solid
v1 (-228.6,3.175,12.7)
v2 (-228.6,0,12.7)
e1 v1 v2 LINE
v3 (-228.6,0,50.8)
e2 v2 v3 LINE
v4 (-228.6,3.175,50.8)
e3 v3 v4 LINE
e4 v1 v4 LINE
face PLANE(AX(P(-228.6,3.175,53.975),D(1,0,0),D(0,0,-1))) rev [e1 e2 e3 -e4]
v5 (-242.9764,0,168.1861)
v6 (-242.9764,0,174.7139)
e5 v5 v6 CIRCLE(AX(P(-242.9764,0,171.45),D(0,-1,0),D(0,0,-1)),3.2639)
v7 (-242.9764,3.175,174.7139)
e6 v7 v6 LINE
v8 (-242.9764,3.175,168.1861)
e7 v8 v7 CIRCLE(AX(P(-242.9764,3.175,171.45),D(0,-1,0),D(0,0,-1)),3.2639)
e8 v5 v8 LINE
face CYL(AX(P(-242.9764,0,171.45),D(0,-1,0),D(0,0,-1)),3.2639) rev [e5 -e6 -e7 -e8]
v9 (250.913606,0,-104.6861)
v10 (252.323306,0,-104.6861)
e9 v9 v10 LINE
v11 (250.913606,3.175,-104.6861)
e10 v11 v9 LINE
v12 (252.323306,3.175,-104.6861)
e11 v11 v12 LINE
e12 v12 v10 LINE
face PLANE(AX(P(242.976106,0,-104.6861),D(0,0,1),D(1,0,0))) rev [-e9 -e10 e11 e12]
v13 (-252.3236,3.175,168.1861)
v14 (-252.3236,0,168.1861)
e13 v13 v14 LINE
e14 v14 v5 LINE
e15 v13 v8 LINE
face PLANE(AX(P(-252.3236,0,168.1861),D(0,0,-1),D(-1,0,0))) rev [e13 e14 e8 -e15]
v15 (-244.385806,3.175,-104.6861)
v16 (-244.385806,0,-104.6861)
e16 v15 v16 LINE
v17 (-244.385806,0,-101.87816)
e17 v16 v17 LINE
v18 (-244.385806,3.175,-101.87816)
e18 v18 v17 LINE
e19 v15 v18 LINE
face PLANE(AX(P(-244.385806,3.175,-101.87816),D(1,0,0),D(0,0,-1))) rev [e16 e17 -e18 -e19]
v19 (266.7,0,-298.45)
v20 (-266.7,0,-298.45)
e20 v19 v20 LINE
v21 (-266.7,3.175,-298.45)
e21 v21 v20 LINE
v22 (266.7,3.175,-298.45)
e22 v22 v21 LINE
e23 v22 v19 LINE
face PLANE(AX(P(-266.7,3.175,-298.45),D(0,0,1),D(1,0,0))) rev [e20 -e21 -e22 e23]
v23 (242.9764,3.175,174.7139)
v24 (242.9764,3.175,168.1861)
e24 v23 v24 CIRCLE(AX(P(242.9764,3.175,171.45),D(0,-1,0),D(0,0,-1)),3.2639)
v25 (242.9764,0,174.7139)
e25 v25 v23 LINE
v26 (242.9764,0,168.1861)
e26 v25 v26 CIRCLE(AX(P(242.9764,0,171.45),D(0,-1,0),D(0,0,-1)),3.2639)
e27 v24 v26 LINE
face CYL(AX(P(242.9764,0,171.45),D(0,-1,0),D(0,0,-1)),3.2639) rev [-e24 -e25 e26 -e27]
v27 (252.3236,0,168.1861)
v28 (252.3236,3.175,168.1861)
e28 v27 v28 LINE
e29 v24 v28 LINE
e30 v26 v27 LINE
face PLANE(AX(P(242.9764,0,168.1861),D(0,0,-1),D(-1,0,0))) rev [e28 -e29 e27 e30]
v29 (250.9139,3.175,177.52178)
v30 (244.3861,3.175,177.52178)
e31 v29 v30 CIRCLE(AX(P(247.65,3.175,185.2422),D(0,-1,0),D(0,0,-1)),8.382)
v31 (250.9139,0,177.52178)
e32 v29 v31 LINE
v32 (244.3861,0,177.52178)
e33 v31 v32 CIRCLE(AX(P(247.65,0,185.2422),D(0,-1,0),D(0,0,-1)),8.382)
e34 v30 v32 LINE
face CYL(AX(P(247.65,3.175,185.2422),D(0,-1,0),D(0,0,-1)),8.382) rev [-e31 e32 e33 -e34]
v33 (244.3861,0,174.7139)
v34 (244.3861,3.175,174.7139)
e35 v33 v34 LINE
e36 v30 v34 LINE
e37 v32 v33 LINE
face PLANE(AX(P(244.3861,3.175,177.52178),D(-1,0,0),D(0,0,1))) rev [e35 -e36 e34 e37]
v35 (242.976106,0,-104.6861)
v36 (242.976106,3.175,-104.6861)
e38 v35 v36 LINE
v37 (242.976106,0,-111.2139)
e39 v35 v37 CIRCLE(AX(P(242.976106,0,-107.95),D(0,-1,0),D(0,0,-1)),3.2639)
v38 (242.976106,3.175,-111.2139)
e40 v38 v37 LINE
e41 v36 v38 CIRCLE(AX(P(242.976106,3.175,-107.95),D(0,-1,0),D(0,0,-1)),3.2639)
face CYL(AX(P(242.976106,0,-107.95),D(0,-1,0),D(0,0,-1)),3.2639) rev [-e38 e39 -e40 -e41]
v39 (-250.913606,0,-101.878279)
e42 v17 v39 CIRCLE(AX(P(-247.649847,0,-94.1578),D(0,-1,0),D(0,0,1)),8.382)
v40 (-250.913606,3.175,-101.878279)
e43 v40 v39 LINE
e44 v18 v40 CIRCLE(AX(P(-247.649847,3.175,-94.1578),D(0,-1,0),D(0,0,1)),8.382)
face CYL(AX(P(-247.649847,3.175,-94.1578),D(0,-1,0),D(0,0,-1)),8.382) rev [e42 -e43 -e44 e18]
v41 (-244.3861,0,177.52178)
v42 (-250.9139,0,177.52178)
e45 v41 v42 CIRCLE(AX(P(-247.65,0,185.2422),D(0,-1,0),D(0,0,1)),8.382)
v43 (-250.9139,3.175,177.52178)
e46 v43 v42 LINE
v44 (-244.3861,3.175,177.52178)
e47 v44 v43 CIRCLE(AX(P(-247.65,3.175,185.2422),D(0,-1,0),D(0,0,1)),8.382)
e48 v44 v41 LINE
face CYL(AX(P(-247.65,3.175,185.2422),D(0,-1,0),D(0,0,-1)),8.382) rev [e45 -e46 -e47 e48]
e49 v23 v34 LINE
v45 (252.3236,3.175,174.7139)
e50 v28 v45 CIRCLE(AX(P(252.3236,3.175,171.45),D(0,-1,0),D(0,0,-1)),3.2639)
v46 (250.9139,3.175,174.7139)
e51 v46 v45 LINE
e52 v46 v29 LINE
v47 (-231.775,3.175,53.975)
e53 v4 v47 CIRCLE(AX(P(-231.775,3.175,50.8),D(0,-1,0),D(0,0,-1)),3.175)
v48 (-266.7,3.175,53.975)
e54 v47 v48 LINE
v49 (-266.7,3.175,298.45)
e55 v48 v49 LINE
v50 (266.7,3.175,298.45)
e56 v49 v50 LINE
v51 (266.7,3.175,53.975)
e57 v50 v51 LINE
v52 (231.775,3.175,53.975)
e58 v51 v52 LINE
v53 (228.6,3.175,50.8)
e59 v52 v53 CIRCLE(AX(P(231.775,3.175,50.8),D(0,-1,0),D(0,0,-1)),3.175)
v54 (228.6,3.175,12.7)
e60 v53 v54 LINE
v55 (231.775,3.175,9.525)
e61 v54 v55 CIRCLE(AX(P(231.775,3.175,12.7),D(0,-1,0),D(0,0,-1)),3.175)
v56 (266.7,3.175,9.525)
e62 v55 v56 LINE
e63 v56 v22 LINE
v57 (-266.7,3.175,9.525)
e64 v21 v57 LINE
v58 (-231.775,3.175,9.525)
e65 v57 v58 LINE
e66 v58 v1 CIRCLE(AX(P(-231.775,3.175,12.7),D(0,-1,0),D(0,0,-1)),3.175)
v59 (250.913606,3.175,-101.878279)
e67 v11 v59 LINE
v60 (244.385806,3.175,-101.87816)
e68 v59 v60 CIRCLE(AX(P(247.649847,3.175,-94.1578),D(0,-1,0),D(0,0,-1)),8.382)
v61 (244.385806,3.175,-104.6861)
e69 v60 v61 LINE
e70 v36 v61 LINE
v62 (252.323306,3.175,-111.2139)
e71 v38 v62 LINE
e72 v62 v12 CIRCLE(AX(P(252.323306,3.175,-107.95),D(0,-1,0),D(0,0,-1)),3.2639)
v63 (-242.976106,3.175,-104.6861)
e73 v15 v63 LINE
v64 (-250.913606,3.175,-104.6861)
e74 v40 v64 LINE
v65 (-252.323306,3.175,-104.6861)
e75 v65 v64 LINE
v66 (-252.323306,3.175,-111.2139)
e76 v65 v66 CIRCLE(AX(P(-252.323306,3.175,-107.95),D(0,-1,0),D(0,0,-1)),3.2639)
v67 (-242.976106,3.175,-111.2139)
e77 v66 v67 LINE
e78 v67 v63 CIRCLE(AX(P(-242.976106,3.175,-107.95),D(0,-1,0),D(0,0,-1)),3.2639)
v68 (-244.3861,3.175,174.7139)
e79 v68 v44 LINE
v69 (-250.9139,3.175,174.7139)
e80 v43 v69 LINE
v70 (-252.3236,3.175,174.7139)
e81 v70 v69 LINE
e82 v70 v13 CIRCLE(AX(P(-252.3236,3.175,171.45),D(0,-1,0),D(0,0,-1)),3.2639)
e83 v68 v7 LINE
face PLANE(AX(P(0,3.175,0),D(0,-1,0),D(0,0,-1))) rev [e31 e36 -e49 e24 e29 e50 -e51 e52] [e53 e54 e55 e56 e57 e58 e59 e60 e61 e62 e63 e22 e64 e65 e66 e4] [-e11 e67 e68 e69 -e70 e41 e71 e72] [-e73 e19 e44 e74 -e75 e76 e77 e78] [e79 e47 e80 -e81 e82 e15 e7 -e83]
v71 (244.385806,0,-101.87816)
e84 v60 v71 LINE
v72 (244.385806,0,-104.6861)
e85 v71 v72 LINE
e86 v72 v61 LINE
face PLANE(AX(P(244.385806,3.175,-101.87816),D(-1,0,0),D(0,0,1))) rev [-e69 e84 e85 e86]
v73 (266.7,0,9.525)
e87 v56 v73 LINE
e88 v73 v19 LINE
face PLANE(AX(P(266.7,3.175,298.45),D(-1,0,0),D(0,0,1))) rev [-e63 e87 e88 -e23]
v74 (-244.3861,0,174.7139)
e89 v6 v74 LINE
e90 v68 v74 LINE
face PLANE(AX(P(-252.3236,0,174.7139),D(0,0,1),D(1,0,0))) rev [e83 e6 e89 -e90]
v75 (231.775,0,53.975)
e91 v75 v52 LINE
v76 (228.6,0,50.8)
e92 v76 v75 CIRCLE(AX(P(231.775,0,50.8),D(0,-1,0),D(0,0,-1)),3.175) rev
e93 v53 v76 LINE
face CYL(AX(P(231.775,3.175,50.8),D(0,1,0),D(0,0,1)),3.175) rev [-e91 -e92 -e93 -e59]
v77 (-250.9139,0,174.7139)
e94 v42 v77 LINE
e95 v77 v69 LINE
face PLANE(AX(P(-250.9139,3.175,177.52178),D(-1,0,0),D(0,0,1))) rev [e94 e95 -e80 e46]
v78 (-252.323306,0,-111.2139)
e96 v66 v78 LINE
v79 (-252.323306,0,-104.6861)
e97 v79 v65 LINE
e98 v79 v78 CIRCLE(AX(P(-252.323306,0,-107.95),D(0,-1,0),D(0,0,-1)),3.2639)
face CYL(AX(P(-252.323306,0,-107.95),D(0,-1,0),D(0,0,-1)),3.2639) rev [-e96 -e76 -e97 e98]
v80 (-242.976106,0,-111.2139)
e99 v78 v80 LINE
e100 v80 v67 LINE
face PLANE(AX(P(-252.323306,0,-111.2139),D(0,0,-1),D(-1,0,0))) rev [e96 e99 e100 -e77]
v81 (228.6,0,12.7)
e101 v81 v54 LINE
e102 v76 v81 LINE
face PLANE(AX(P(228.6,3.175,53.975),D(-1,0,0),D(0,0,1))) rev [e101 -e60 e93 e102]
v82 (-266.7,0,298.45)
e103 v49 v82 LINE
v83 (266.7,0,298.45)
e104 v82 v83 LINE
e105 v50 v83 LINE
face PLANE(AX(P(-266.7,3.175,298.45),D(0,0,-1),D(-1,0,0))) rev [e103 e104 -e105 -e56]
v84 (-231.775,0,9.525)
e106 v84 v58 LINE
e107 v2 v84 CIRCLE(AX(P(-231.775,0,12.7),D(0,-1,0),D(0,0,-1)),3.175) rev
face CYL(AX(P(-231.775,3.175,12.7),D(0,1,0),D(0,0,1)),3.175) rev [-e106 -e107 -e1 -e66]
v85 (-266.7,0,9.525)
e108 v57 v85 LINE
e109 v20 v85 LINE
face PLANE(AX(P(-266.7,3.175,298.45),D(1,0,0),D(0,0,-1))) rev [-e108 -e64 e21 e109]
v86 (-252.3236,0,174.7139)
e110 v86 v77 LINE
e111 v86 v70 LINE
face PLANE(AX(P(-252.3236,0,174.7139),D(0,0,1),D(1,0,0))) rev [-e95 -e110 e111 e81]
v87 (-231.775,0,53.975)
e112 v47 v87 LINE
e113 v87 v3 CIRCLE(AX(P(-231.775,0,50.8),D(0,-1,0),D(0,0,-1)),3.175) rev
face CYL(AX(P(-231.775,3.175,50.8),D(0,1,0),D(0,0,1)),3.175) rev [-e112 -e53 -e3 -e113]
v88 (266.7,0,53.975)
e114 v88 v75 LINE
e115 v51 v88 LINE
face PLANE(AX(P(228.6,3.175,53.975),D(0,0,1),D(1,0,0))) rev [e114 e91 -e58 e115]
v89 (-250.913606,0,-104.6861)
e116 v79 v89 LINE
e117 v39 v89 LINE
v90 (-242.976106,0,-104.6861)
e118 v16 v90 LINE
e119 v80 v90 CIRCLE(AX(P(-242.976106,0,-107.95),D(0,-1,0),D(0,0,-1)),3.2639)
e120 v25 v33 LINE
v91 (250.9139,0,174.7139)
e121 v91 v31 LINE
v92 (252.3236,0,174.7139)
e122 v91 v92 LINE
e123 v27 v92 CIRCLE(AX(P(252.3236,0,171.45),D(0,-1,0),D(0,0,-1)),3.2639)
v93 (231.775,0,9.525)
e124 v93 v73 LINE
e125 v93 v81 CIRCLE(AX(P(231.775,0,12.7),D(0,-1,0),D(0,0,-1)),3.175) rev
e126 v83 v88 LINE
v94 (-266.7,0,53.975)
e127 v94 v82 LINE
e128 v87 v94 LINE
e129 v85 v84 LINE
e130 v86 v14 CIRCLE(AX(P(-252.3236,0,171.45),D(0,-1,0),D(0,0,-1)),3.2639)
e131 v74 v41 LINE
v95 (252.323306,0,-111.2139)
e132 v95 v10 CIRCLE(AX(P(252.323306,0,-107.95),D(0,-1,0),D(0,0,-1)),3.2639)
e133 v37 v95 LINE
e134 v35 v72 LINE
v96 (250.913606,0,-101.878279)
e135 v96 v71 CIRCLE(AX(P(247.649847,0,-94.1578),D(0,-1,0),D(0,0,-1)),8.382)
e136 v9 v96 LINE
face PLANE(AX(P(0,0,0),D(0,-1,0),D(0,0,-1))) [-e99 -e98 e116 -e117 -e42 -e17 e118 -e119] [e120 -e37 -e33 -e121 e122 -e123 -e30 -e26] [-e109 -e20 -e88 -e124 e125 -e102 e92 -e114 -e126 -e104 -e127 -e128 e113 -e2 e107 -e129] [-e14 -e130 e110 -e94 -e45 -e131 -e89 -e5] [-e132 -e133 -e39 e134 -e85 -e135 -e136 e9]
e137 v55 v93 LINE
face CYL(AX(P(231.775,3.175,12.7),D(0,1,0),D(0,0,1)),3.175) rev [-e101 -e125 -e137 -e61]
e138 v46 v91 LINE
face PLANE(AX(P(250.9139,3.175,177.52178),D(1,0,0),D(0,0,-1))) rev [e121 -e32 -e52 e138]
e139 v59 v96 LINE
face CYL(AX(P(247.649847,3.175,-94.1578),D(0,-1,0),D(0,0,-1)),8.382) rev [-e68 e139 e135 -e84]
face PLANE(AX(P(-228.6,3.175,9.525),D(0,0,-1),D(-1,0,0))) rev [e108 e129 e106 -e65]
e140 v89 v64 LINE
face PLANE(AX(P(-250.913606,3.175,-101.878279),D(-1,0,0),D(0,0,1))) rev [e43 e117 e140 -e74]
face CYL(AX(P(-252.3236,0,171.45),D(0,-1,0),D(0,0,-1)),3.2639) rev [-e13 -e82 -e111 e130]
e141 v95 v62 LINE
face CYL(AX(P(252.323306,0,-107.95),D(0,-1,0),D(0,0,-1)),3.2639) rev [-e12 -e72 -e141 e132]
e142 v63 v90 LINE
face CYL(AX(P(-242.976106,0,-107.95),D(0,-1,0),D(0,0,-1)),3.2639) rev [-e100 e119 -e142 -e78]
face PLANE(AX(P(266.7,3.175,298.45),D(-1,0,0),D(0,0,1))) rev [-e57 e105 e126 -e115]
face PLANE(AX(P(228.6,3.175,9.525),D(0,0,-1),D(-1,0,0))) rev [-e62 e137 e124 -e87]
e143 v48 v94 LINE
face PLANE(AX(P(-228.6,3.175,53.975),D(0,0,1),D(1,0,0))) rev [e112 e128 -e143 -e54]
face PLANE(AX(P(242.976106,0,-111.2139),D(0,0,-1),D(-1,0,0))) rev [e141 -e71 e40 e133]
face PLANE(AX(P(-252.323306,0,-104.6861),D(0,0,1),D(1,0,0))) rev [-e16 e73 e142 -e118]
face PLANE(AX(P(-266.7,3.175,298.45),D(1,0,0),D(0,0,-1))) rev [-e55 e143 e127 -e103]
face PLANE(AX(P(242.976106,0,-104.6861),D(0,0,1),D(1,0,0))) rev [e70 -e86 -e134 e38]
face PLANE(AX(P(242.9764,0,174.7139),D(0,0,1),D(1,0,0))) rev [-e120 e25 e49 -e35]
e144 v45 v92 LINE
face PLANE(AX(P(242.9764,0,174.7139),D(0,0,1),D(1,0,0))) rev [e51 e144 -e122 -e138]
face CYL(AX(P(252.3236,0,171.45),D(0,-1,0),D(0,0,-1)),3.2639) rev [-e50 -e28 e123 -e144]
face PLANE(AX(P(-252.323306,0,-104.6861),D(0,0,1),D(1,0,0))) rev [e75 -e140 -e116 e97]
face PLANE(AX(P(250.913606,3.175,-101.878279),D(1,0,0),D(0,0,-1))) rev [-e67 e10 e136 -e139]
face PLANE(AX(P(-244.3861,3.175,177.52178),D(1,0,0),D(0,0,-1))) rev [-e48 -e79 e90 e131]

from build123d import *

# Parameters (mm, degrees)
SKETCH1_W                    = 533.4
SKETCH1_H                    = 596.9
BOSS_EXTRUDE1_DEPTH          = 3.175
CUT_EXTRUDE1_DEPTH           = 401.264129201
F_0_257_DIAMETER_SLOT1_DEPTH = 3.175
SKETCH8_W                    = 38.1
SKETCH8_H                    = 44.45
CUT_EXTRUDE2_DEPTH           = 401.264129201
FILLET1_R                    = 3.175


# Read off the part's stored shape, not the designer's step: F (0.257) Diameter Slot1
with BuildPart() as part:
    # Sketch1 → Boss-Extrude1 (new body)
    with BuildSketch(Plane(origin=(0, 0, 0), x_dir=(1, 0, 0), z_dir=(0, 1, 0))):
        Rectangle(SKETCH1_W, SKETCH1_H)
    extrude(amount=BOSS_EXTRUDE1_DEPTH)

    # Sketch5 → Cut-Extrude1 (cut, through all)
    with BuildSketch(Plane.XZ):
        with BuildLine():
            Line((244.385805934, -101.878160113), (244.385805934, -107.950617892))
            ThreePointArc((244.385805934, -107.950617892), (247.65, -111.213899987), (250.913605875, -107.950029643))
            Line((250.913605875, -107.950029643), (250.913605875, -101.878279337))
            ThreePointArc((250.913605875, -101.878279337), (247.65, -85.775799987), (244.385805934, -101.878160113))
        make_face()
        with BuildLine():
            Line((250.9139, 177.521780271), (250.9139, 171.450000343))
            ThreePointArc((250.9139, 171.450000343), (247.65, 168.1861), (244.3861, 171.450000343))
            Line((244.3861, 171.450000343), (244.3861, 177.521780271))
            ThreePointArc((244.3861, 177.521780271), (247.65, 193.6242), (250.9139, 177.521780271))
        make_face()
        with BuildLine():
            Line((-244.3861, 177.521780271), (-244.3861, 171.450000343))
            ThreePointArc((-244.3861, 171.450000343), (-247.65, 168.1861), (-250.9139, 171.450000343))
            Line((-250.9139, 171.450000343), (-250.9139, 177.521780271))
            ThreePointArc((-250.9139, 177.521780271), (-247.65, 193.6242), (-244.3861, 177.521780271))
        make_face()
        with BuildLine():
            Line((-250.913605875, -101.878279337), (-250.913605875, -107.950029643))
            ThreePointArc((-250.913605875, -107.950029643), (-247.65, -111.213899987), (-244.385805934, -107.950617892))
            Line((-244.385805934, -107.950617892), (-244.385805934, -101.878160113))
            ThreePointArc((-244.385805934, -101.878160113), (-247.65, -85.775799987), (-250.913605875, -101.878279337))
        make_face()
    extrude(amount=-CUT_EXTRUDE1_DEPTH, mode=Mode.SUBTRACT)

    # F (0.257) Diameter Slot1 outline → F (0.257) Diameter Slot1 (cut)
    with BuildSketch(Plane(origin=(0, 0, 0), x_dir=(1, 0, 0), z_dir=(0, 1, 0))):
        with BuildLine():
            ThreePointArc((252.3236, -174.7139), (255.5875, -171.45), (252.3236, -168.1861))
            Line((252.3236, -168.1861), (247.65, -168.1861))
            ThreePointArc((247.65, -168.1861), (249.957925944, -169.142074298), (250.9139, -171.450000343))
            Line((250.9139, -171.450000343), (250.9139, -174.7139))
            Line((250.9139, -174.7139), (252.3236, -174.7139))
        make_face()
        with BuildLine():
            ThreePointArc((244.3861, -171.450000343), (245.342074056, -169.142074298), (247.65, -168.1861))
            Line((247.65, -168.1861), (242.9764, -168.1861))
            ThreePointArc((242.9764, -168.1861), (239.7125, -171.45), (242.9764, -174.7139))
            Line((242.9764, -174.7139), (244.3861, -174.7139))
            Line((244.3861, -174.7139), (244.3861, -171.450000343))
        make_face()
        with BuildLine():
            ThreePointArc((-242.9764, -174.7139), (-239.7125, -171.45), (-242.9764, -168.1861))
            Line((-242.9764, -168.1861), (-247.65, -168.1861))
            ThreePointArc((-247.65, -168.1861), (-245.342074056, -169.142074298), (-244.3861, -171.450000343))
            Line((-244.3861, -171.450000343), (-244.3861, -174.7139))
            Line((-244.3861, -174.7139), (-242.9764, -174.7139))
        make_face()
        with BuildLine():
            ThreePointArc((-250.9139, -171.450000343), (-249.957925944, -169.142074298), (-247.65, -168.1861))
            Line((-247.65, -168.1861), (-252.3236, -168.1861))
            ThreePointArc((-252.3236, -168.1861), (-255.5875, -171.45), (-252.3236, -174.7139))
            Line((-252.3236, -174.7139), (-250.9139, -174.7139))
            Line((-250.9139, -174.7139), (-250.9139, -171.450000343))
        make_face()
        with BuildLine():
            ThreePointArc((252.323305875, 104.6861), (255.587205875, 107.95), (252.323305875, 111.2139))
            Line((252.323305875, 111.2139), (247.649705875, 111.2139))
            ThreePointArc((247.649705875, 111.2139), (249.957621218, 110.257936304), (250.913605875, 107.950029643))
            Line((250.913605875, 107.950029643), (250.913605875, 104.6861))
            Line((250.913605875, 104.6861), (252.323305875, 104.6861))
        make_face()
        with BuildLine():
            ThreePointArc((244.385805934, 107.950617892), (245.34199852, 110.258144271), (247.649705875, 111.2139))
            Line((247.649705875, 111.2139), (242.976105875, 111.2139))
            ThreePointArc((242.976105875, 111.2139), (239.712205875, 107.95), (242.976105875, 104.6861))
            Line((242.976105875, 104.6861), (244.385805934, 104.6861))
            Line((244.385805934, 104.6861), (244.385805934, 107.950617892))
        make_face()
        with BuildLine():
            ThreePointArc((-242.976105875, 104.6861), (-239.712205875, 107.95), (-242.976105875, 111.2139))
            Line((-242.976105875, 111.2139), (-247.649705876, 111.2139))
            ThreePointArc((-247.649705876, 111.2139), (-245.341998521, 110.258144271), (-244.385805934, 107.950617892))
            Line((-244.385805934, 107.950617892), (-244.385805934, 104.6861))
            Line((-244.385805934, 104.6861), (-242.976105875, 104.6861))
        make_face()
        with BuildLine():
            ThreePointArc((-250.913605875, 107.950029643), (-249.957621218, 110.257936303), (-247.649705876, 111.2139))
            Line((-247.649705876, 111.2139), (-252.323305875, 111.2139))
            ThreePointArc((-252.323305875, 111.2139), (-255.587205875, 107.95), (-252.323305875, 104.6861))
            Line((-252.323305875, 104.6861), (-250.913605875, 104.6861))
            Line((-250.913605875, 104.6861), (-250.913605875, 107.950029643))
        make_face()
    extrude(amount=F_0_257_DIAMETER_SLOT1_DEPTH, mode=Mode.SUBTRACT)

    # Sketch8 → Cut-Extrude2 (cut, through all)
    with BuildSketch(Plane.XZ):
        with Locations((-247.65, 31.75)):
            Rectangle(SKETCH8_W, SKETCH8_H)
        with Locations((247.65, 31.75)):
            Rectangle(SKETCH8_W, SKETCH8_H)
    extrude(amount=-CUT_EXTRUDE2_DEPTH, mode=Mode.SUBTRACT)

    # Fillet1
    fillet1_edges = [part.edges().sort_by_distance(p)[0] for p in [
        (-228.6, 1.5875, 53.975),
        (-228.6, 1.5875, 9.525),
        (228.6, 1.5875, 9.525),
        (228.6, 1.5875, 53.975),
    ]]
    fillet(fillet1_edges, radius=FILLET1_R)


solid = part.part
